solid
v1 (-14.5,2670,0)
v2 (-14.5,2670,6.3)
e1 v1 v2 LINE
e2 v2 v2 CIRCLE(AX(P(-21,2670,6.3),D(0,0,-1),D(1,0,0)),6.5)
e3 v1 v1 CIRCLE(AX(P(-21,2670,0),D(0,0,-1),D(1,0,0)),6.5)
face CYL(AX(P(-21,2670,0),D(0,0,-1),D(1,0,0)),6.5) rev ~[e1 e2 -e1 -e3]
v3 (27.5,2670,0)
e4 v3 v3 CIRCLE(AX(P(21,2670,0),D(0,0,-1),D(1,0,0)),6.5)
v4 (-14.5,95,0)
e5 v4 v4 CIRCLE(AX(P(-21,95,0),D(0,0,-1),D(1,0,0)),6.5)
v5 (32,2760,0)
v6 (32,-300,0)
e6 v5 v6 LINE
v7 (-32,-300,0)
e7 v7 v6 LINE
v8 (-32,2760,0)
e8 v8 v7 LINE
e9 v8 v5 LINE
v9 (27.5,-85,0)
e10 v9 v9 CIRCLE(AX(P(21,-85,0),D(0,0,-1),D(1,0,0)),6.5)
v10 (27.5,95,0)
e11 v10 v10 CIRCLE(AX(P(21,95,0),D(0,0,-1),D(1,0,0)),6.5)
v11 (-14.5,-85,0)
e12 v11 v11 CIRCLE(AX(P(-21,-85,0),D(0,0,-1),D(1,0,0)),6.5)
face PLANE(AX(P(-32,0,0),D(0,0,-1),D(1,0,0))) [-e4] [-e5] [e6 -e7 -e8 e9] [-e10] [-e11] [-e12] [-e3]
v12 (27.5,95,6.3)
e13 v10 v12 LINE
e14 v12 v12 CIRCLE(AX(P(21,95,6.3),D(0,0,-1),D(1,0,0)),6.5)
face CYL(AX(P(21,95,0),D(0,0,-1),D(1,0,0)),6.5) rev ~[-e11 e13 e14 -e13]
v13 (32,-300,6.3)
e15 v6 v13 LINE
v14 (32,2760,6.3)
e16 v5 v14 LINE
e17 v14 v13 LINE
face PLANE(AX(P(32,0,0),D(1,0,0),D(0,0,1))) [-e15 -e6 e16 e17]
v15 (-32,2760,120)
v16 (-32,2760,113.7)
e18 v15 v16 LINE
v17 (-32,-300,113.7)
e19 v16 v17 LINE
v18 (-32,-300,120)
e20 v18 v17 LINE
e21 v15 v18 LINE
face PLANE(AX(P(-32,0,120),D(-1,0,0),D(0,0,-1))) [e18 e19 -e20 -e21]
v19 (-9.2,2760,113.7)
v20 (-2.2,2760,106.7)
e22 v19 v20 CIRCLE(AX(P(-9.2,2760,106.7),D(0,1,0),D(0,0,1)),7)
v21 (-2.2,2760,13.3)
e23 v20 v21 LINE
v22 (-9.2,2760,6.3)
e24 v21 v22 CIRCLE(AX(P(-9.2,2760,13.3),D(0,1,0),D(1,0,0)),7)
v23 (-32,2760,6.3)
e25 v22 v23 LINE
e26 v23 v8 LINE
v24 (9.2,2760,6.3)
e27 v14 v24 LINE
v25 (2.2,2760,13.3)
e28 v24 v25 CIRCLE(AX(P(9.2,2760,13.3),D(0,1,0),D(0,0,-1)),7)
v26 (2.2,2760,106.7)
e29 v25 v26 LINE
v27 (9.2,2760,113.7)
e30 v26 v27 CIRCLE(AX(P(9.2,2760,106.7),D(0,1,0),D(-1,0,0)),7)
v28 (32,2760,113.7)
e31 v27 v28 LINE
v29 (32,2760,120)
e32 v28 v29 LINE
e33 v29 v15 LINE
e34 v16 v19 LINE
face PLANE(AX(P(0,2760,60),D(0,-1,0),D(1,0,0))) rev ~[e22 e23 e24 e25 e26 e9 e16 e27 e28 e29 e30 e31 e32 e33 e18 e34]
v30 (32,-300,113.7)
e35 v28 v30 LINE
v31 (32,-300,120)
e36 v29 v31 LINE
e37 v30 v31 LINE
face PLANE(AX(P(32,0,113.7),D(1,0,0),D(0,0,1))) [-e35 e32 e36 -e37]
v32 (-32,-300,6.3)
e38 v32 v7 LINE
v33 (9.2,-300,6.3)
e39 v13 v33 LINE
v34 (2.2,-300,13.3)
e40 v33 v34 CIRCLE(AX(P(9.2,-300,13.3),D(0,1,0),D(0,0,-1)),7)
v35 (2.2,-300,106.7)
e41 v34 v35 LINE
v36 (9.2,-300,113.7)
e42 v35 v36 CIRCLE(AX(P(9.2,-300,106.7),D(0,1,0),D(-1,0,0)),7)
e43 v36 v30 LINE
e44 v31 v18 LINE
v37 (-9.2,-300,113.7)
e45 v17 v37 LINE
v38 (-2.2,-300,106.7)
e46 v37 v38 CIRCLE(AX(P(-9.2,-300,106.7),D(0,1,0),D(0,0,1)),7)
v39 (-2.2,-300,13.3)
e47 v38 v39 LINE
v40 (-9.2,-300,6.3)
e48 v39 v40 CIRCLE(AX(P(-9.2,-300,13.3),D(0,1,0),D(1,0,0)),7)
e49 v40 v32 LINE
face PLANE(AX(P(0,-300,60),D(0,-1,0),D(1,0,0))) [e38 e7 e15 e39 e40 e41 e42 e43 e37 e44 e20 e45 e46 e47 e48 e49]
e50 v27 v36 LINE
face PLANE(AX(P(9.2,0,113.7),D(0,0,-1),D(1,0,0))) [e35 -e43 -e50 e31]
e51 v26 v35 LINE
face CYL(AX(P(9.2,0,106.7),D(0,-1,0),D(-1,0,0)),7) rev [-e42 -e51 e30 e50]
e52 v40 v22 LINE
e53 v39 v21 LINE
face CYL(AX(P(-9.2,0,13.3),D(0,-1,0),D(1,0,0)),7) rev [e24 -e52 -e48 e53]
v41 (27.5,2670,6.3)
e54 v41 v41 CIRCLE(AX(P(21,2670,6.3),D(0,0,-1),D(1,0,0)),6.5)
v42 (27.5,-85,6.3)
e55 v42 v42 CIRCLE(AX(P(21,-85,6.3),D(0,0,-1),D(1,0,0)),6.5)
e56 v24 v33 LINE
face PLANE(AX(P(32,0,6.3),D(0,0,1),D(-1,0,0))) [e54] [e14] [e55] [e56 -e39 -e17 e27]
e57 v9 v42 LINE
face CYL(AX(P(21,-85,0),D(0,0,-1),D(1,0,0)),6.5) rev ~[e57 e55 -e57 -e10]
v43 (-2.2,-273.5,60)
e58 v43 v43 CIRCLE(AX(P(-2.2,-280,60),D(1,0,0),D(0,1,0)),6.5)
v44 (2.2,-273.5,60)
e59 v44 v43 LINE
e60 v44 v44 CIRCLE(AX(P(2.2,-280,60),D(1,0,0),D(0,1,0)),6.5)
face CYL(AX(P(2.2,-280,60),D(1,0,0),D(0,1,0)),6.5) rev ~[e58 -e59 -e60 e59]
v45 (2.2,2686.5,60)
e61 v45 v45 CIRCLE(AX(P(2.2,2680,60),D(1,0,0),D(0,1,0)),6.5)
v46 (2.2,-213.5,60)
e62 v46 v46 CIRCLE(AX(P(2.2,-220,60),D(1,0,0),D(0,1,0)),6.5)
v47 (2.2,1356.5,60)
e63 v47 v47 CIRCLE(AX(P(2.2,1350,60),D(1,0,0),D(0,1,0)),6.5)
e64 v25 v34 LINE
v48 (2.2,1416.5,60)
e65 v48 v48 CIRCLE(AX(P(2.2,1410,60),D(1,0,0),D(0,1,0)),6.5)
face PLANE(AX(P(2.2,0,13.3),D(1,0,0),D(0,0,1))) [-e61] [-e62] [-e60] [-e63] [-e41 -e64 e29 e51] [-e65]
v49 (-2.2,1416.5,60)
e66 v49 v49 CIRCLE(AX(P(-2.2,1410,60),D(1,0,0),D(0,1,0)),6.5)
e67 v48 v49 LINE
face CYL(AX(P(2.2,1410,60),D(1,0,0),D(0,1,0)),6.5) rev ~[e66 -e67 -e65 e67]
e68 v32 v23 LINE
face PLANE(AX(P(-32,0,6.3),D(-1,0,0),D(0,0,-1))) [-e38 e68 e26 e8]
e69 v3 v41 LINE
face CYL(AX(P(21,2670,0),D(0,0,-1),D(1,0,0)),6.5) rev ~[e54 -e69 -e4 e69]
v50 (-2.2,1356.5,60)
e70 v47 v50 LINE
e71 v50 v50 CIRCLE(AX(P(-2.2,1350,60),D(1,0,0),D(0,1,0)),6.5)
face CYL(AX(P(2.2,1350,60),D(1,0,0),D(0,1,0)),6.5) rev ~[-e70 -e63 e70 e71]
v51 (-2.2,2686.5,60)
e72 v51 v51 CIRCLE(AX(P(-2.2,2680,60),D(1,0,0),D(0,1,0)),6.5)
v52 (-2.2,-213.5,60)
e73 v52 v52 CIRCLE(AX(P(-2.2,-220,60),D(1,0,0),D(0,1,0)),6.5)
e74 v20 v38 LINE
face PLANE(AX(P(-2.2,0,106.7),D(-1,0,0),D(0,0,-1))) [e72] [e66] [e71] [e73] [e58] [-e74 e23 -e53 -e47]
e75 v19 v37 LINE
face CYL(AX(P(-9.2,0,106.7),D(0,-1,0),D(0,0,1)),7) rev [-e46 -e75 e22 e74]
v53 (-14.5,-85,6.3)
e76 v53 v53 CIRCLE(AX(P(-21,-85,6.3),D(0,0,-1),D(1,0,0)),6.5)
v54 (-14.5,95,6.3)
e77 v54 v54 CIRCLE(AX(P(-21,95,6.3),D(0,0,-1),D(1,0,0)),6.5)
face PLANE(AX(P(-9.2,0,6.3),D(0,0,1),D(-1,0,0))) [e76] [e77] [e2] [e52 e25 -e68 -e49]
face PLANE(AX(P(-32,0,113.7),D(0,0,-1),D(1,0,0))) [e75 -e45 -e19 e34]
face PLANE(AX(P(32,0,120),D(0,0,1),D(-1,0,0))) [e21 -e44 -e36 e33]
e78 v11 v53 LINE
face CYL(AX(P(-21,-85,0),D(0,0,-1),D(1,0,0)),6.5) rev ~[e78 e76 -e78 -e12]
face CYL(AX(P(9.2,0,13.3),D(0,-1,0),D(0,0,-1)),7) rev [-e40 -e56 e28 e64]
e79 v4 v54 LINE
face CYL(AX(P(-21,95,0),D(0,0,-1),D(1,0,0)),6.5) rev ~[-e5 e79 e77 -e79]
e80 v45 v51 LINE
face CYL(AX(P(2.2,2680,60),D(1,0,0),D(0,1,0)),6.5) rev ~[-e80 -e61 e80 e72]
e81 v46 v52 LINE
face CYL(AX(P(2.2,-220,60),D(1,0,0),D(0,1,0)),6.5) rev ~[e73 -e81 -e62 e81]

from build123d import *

# Parameters (mm, degrees)
F1_DEPTH      = 300
F1_DEPTH_BACK = 2760
F2_R          = 6.5
F3_DEPTH      = 6.3
F4_R          = 6.5
F5_DEPTH      = 34.201


# Not quite as in the source:
# - a feature names something its author has since deleted; it is built from what else it names


with BuildPart() as f1:
    # F0 (on Front) → F1 (new body, two sides)
    with BuildSketch(Plane.XZ) as f1_sk:
        with BuildLine():
            Line((-32, 6.3), (-32, 0))
            Line((-32, 0), (32, 0))
            Line((32, 0), (32, 6.3))
            Line((32, 6.3), (9.2, 6.3))
            ThreePointArc((9.2, 6.3), (4.2502525317, 8.3502525317), (2.2, 13.3))
            Line((2.2, 13.3), (2.2, 106.7))
            ThreePointArc((2.2, 106.7), (4.2502525317, 111.6497474683), (9.2, 113.7))
            Line((9.2, 113.7), (32, 113.7))
            Line((32, 113.7), (32, 120))
            Line((32, 120), (-32, 120))
            Line((-32, 120), (-32, 113.7))
            Line((-32, 113.7), (-9.2, 113.7))
            ThreePointArc((-9.2, 113.7), (-4.2502525317, 111.6497474683), (-2.2, 106.7))
            Line((-2.2, 106.7), (-2.2, 13.3))
            ThreePointArc((-2.2, 13.3), (-4.2502525317, 8.3502525317), (-9.2, 6.3))
            Line((-9.2, 6.3), (-32, 6.3))
        make_face()
    extrude(amount=F1_DEPTH)
    extrude(f1_sk.sketch, amount=-F1_DEPTH_BACK)

    # F2 (on face) → F3 (cut, through all)
    with BuildSketch(Plane(origin=(0, 0, 0), x_dir=(1, 0, 0), z_dir=(0, 0, -1))):
        with Locations((21, 85)):
            Circle(F2_R)
        with Locations((-21, 85)):
            Circle(F2_R)
        with Locations((-21, -95)):
            Circle(F2_R)
        with Locations((21, -95)):
            Circle(F2_R)
        with Locations((-21, -2670)):
            Circle(F2_R)
        with Locations((21, -2670)):
            Circle(F2_R)
    extrude(amount=-F3_DEPTH, mode=Mode.SUBTRACT)

    # F4 (on face) → F5 (cut, through all)
    with BuildSketch(Plane.YZ.offset(2.2)):
        with Locations((2680, 60)):
            Circle(F4_R)
        with Locations((-280, 60)):
            Circle(F4_R)
        with Locations((-220, 60)):
            Circle(F4_R)
        with Locations((1350, 60)):
            Circle(F4_R)
        with Locations((1410, 60)):
            Circle(F4_R)
    extrude(amount=-F5_DEPTH, mode=Mode.SUBTRACT)


solid = f1.part
